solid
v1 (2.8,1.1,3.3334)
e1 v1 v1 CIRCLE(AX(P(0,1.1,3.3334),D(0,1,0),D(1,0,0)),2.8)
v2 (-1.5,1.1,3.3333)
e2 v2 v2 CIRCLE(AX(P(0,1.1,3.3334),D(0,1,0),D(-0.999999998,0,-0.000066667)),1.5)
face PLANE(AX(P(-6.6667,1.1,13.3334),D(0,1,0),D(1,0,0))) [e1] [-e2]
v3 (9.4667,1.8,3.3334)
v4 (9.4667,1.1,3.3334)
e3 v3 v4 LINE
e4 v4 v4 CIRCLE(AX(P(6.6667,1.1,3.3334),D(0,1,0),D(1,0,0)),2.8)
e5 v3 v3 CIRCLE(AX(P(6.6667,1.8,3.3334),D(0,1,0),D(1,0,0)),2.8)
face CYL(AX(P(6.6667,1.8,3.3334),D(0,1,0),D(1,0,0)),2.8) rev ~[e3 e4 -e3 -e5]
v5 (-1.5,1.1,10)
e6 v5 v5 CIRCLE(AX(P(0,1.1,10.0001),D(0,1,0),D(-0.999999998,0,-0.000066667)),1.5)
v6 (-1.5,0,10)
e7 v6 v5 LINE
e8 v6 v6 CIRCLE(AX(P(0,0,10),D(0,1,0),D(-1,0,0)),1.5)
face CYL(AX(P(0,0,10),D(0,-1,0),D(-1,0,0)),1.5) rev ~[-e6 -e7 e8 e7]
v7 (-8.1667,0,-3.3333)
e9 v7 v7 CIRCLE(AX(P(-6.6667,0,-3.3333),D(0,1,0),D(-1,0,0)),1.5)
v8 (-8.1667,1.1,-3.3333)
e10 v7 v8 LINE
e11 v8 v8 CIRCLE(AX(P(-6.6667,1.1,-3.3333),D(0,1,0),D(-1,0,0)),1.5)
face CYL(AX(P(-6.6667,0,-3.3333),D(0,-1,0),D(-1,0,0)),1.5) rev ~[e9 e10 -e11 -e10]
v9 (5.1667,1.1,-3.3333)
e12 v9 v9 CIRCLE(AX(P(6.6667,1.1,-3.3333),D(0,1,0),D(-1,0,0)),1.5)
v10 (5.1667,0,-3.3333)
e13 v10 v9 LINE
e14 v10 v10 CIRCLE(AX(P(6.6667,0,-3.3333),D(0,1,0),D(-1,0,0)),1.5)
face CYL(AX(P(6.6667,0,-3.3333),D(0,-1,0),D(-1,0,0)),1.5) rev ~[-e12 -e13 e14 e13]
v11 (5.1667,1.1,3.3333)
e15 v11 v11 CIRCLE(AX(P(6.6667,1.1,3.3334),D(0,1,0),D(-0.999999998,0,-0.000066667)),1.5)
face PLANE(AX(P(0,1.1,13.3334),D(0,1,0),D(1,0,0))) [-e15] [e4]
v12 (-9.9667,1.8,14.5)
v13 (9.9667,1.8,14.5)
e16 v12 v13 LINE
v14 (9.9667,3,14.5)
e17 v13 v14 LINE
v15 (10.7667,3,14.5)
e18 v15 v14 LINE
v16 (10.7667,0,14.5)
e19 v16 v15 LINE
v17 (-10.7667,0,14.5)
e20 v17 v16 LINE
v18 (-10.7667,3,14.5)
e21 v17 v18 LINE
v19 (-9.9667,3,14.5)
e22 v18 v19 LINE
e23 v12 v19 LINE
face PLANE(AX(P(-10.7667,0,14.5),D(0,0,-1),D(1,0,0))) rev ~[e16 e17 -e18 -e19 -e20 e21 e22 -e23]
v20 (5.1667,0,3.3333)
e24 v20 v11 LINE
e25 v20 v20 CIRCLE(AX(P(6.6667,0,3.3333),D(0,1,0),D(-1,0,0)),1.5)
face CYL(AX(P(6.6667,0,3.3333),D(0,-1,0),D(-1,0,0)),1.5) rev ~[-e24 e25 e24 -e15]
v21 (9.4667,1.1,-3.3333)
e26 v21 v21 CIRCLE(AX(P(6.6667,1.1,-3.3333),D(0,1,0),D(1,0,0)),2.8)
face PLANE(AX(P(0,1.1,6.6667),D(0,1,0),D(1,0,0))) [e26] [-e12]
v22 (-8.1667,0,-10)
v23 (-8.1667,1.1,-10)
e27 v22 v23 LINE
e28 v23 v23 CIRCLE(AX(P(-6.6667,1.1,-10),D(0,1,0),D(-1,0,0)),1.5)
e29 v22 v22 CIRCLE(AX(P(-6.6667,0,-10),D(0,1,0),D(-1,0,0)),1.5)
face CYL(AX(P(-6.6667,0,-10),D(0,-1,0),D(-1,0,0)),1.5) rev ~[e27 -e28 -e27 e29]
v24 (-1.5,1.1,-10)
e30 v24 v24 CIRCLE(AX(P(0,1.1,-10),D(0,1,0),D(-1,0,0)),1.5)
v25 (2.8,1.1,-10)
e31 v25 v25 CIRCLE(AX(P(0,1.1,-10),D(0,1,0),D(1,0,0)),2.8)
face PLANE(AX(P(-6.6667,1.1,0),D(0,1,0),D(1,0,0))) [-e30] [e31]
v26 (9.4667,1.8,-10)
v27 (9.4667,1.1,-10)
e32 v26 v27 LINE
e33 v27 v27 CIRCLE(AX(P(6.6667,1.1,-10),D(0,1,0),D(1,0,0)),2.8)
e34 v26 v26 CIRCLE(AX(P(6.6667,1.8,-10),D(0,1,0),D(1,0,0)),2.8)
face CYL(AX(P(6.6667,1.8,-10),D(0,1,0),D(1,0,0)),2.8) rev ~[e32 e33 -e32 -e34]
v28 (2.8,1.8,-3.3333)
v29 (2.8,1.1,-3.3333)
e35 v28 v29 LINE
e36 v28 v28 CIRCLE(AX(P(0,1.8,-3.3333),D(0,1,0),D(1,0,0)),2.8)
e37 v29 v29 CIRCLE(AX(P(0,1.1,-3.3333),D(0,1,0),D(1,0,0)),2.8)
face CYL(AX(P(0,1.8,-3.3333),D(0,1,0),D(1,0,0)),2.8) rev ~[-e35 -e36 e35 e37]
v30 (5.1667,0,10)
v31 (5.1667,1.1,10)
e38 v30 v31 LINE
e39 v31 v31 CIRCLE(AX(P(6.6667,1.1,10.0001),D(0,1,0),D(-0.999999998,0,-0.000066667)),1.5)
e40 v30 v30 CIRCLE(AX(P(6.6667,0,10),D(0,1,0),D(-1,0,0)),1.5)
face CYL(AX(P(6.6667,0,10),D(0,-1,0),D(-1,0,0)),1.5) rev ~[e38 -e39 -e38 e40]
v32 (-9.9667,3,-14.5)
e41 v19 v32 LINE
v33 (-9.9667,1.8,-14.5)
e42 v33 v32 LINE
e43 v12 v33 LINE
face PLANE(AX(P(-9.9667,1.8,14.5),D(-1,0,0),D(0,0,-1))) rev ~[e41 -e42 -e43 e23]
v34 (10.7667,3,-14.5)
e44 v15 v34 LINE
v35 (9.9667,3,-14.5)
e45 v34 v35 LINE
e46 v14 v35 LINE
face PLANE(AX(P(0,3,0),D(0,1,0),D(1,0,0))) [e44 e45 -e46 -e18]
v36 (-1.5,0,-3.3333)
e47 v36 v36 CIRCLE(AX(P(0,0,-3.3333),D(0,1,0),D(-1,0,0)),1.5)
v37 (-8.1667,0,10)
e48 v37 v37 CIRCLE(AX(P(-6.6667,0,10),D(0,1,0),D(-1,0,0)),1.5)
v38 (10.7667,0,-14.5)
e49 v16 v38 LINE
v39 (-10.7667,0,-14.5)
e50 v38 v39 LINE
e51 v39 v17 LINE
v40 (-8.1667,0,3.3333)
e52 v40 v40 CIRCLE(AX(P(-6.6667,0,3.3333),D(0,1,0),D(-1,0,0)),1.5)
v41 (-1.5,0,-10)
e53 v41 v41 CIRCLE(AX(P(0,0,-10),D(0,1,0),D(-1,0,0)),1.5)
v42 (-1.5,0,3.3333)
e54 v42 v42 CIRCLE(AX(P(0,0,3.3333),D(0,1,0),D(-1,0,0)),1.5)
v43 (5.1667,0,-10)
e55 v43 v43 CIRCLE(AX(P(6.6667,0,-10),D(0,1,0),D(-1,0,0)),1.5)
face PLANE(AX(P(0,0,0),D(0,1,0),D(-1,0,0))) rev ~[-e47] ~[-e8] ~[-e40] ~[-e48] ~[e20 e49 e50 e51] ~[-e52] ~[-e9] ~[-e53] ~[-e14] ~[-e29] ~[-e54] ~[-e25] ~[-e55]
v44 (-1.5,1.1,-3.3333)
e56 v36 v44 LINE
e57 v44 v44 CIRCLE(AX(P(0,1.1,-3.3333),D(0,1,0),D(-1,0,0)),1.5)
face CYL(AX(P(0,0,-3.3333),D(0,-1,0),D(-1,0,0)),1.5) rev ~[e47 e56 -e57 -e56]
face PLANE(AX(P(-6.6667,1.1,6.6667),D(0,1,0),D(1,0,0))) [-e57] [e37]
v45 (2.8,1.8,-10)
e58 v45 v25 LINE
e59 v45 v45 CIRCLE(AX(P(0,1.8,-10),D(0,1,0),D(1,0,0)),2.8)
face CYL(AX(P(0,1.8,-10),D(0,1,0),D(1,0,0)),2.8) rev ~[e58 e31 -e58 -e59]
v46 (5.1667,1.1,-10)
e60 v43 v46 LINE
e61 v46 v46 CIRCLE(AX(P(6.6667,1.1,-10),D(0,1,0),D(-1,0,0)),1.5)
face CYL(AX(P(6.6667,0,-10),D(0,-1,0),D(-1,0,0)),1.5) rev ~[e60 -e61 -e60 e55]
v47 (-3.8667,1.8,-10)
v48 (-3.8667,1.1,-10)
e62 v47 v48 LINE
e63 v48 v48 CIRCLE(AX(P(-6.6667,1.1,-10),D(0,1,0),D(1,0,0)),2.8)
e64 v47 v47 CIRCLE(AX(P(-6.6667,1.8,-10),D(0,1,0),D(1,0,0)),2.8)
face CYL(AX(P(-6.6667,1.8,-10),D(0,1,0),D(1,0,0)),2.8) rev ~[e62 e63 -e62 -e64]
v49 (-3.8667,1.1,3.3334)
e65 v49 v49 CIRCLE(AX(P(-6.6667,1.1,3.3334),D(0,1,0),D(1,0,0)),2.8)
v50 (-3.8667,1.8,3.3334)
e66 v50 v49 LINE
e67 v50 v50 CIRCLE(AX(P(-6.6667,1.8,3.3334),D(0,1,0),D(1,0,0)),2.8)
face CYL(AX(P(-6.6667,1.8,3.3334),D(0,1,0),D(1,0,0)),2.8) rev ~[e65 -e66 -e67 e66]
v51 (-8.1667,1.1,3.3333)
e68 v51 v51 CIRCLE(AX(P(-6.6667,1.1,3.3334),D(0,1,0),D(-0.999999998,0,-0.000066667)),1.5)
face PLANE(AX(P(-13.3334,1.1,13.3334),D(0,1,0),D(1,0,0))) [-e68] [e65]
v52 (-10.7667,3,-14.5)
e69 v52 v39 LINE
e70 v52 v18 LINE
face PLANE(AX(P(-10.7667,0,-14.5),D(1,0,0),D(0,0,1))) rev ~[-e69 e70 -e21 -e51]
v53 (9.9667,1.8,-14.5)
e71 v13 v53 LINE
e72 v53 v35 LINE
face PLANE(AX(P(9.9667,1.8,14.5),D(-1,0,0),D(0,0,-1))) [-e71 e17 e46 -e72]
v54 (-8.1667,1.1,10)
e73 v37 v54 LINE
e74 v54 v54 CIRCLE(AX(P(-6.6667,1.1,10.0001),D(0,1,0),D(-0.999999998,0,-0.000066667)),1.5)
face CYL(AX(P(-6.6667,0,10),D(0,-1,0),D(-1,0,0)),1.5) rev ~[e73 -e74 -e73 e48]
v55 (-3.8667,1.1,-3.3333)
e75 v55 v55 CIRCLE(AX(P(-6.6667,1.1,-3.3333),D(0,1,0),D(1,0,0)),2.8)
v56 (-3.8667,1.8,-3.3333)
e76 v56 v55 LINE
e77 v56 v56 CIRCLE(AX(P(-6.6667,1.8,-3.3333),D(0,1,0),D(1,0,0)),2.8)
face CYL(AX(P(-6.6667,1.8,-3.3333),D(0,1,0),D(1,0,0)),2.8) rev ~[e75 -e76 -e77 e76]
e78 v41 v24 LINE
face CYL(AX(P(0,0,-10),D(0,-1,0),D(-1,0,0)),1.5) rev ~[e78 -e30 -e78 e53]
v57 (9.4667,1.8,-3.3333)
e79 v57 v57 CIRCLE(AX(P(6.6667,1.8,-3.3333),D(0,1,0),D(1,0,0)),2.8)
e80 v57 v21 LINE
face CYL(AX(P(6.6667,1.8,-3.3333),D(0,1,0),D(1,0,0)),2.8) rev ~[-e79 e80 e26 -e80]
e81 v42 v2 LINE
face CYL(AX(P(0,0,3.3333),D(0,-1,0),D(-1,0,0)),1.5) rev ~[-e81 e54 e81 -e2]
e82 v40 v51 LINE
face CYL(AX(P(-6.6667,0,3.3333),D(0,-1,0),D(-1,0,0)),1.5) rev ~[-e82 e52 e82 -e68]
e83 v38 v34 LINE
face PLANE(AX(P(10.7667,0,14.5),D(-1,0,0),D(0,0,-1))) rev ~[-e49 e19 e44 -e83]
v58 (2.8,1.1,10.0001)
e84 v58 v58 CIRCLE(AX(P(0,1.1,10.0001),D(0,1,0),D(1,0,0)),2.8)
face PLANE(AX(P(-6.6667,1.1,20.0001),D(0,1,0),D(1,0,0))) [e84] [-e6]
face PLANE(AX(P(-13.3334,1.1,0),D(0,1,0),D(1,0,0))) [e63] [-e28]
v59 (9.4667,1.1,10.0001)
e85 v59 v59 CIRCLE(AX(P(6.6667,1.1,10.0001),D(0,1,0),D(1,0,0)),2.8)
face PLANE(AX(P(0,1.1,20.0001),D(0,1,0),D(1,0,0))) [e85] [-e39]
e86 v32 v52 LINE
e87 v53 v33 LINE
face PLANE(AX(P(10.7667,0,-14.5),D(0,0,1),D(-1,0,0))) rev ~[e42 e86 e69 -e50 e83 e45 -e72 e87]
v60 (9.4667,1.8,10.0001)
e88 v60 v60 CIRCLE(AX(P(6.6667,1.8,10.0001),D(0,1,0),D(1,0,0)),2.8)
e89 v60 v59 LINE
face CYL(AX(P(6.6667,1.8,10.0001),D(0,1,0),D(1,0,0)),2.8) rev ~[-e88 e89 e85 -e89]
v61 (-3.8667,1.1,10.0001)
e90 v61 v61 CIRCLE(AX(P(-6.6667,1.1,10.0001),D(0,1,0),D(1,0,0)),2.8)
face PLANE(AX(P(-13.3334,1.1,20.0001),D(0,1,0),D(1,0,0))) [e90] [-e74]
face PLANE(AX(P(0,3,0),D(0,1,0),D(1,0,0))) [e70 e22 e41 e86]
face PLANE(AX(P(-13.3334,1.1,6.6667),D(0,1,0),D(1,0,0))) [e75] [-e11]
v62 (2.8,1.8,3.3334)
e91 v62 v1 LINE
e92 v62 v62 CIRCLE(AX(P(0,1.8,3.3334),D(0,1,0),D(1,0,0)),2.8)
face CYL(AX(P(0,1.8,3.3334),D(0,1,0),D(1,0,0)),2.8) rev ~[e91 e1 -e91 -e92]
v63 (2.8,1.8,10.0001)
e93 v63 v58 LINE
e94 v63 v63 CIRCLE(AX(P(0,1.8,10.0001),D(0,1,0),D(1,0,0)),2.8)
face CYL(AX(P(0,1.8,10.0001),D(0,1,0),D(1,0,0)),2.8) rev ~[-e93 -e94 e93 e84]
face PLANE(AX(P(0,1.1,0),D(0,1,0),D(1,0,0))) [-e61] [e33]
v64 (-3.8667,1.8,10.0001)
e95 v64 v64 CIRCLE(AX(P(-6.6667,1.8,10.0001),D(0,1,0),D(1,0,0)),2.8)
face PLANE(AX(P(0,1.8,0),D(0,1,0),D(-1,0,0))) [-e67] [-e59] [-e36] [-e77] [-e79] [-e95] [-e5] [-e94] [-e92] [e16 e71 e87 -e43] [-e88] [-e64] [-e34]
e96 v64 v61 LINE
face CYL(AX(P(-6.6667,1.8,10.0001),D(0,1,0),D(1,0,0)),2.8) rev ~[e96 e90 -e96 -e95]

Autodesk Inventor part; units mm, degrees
ref_plane "Плоскость YZ" through (0, 0, 0) normal (1, 0, 0) x (0, 1, 0)
ref_plane "Плоскость XZ" through (0, 0, 0) normal (0, 1, 0) x (-1, 0, 0)
ref_plane "Плоскость XY" through (0, 0, 0) normal (0, 0, 1) x (1, 0, 0)
sketch "Эскиз1" plane through (0, 0, 0) normal (0, 1, 0) x (-1, 0, 0)
  line L0 (9.1667, 12.5) -> (-9.1667, 12.5)
  line L1 (-9.1667, 12.5) -> (-9.1667, -12.5)
  line L2 (-9.1667, -12.5) -> (9.1667, -12.5)
  line L3 (9.1667, -12.5) -> (9.1667, 12.5)
  line L4 (9.1667, 12.5) -> (-9.1667, -12.5) construction
  line L5 (-9.1667, 12.5) -> (9.1667, -12.5) construction
  line L6 (10.7667, 14.5) -> (-10.7667, 14.5)
  line L7 (-10.7667, 14.5) -> (-10.7667, -14.5)
  line L8 (-10.7667, -14.5) -> (10.7667, -14.5)
  line L9 (10.7667, -14.5) -> (10.7667, 14.5)
  line L10 (10.7667, 14.5) -> (-10.7667, -14.5) construction
  line L11 (-10.7667, 14.5) -> (10.7667, -14.5) construction
  circle A0 centre (6.6667, 10) radius 1.5
  circle A1 centre (6.6667, 3.3333) radius 1.5
  circle A2 centre (6.6667, -3.3333) radius 1.5
  circle A3 centre (6.6667, -10) radius 1.5
  circle A4 centre (0, 10) radius 1.5
  circle A5 centre (0, 3.3333) radius 1.5
  circle A6 centre (0, -3.3333) radius 1.5
  circle A7 centre (0, -10) radius 1.5
  circle A8 centre (-6.6667, 10) radius 1.5
  circle A9 centre (-6.6667, 3.3333) radius 1.5
  circle A10 centre (-6.6667, -3.3333) radius 1.5
  circle A11 centre (-6.6667, -10) radius 1.5
  point P0 (0, 0)
  dimension "d0" = 18.3333
  dimension "d1" = 25
  dimension "d2" = 1.6
  dimension "d3" = 2
  dimension "d4" = 3
  dimension "d5" = 2.5
  dimension "d6" = 2.5
  dimension "d9" = 6.6667
  dimension "d12" = 6.6667
extrude "Выдавливание1" add sketch "Эскиз1" along normal blind 1.8 contours L3 L2 L1 L0 | L9 L8 L7 L6
sketch "Эскиз2" plane through (0, 1.8, 0) normal (0, 1, 0) x (1, 0, 0)
  circle A0 centre (6.6667, 10) radius 1.5 projected
  circle A1 centre (6.6667, -3.3333) radius 1.5 projected
  circle A2 centre (0, 10) radius 1.5 projected
  circle A3 centre (0, 3.3333) radius 1.5 projected
  circle A4 centre (0, -3.3333) radius 1.5 projected
  circle A5 centre (0, -10) radius 1.5 projected
  circle A6 centre (-6.6667, 10) radius 1.5 projected
  circle A7 centre (-6.6667, 3.3333) radius 1.5 projected
  circle A8 centre (-6.6667, -3.3333) radius 1.5 projected
  circle A9 centre (-6.6667, -10) radius 1.5 projected
  circle A10 centre (6.6667, -10) radius 1.5 projected
  circle A11 centre (6.6667, 3.3333) radius 1.5 projected
  circle A12 centre (6.6667, 10) radius 1.5 projected
  circle A13 centre (6.6667, 10) radius 2.8
  point P0 (0, 0)
  dimension "d39" = 5.6
extrude "Выдавливание2" cut sketch "Эскиз2" against normal blind 0.7 contours A13
sketch "Эскиз3" plane through (0, 1.8, 0) normal (0, 1, 0) x (1, 0, 0)
  line L0 (-10.7667, 14.5) -> (-10.7667, -14.5) projected
  line L1 (10.7667, 14.5) -> (-10.7667, 14.5) projected
  line L2 (-10.7667, -14.5) -> (-9.9667, -14.5)
  line L3 (-9.9667, -14.5) -> (-9.9667, 14.5)
  line L4 (-9.9667, 14.5) -> (-10.7667, 14.5)
  line L5 (-10.7667, 14.5) -> (-10.7667, -14.5)
  line L6 (10.7667, -14.5) -> (10.7667, 14.5) projected
  line L7 (10.7667, -14.5) -> (9.9667, -14.5)
  line L8 (9.9667, -14.5) -> (9.9667, 14.5)
  line L9 (9.9667, 14.5) -> (10.7667, 14.5)
  line L10 (10.7667, 14.5) -> (10.7667, -14.5)
  point P0 (0, 0)
  point P1 (9.9667, 14.5)
  dimension "d29" = 0.8
  dimension "d30" = 0.8
extrude "Выдавливание3" add sketch "Эскиз3" along normal blind 1.2
pattern_linear "Прямоуг.массив2" count 4 spacing 6.6667 along (0, 0, 1) count 3 spacing 6.6667 along (-1, 0, 0) of "Выдавливание2"
equation "\"d6\" = d5"
equation "\"d30\" = d29"
properties part number "Test1" material "Типовой"
